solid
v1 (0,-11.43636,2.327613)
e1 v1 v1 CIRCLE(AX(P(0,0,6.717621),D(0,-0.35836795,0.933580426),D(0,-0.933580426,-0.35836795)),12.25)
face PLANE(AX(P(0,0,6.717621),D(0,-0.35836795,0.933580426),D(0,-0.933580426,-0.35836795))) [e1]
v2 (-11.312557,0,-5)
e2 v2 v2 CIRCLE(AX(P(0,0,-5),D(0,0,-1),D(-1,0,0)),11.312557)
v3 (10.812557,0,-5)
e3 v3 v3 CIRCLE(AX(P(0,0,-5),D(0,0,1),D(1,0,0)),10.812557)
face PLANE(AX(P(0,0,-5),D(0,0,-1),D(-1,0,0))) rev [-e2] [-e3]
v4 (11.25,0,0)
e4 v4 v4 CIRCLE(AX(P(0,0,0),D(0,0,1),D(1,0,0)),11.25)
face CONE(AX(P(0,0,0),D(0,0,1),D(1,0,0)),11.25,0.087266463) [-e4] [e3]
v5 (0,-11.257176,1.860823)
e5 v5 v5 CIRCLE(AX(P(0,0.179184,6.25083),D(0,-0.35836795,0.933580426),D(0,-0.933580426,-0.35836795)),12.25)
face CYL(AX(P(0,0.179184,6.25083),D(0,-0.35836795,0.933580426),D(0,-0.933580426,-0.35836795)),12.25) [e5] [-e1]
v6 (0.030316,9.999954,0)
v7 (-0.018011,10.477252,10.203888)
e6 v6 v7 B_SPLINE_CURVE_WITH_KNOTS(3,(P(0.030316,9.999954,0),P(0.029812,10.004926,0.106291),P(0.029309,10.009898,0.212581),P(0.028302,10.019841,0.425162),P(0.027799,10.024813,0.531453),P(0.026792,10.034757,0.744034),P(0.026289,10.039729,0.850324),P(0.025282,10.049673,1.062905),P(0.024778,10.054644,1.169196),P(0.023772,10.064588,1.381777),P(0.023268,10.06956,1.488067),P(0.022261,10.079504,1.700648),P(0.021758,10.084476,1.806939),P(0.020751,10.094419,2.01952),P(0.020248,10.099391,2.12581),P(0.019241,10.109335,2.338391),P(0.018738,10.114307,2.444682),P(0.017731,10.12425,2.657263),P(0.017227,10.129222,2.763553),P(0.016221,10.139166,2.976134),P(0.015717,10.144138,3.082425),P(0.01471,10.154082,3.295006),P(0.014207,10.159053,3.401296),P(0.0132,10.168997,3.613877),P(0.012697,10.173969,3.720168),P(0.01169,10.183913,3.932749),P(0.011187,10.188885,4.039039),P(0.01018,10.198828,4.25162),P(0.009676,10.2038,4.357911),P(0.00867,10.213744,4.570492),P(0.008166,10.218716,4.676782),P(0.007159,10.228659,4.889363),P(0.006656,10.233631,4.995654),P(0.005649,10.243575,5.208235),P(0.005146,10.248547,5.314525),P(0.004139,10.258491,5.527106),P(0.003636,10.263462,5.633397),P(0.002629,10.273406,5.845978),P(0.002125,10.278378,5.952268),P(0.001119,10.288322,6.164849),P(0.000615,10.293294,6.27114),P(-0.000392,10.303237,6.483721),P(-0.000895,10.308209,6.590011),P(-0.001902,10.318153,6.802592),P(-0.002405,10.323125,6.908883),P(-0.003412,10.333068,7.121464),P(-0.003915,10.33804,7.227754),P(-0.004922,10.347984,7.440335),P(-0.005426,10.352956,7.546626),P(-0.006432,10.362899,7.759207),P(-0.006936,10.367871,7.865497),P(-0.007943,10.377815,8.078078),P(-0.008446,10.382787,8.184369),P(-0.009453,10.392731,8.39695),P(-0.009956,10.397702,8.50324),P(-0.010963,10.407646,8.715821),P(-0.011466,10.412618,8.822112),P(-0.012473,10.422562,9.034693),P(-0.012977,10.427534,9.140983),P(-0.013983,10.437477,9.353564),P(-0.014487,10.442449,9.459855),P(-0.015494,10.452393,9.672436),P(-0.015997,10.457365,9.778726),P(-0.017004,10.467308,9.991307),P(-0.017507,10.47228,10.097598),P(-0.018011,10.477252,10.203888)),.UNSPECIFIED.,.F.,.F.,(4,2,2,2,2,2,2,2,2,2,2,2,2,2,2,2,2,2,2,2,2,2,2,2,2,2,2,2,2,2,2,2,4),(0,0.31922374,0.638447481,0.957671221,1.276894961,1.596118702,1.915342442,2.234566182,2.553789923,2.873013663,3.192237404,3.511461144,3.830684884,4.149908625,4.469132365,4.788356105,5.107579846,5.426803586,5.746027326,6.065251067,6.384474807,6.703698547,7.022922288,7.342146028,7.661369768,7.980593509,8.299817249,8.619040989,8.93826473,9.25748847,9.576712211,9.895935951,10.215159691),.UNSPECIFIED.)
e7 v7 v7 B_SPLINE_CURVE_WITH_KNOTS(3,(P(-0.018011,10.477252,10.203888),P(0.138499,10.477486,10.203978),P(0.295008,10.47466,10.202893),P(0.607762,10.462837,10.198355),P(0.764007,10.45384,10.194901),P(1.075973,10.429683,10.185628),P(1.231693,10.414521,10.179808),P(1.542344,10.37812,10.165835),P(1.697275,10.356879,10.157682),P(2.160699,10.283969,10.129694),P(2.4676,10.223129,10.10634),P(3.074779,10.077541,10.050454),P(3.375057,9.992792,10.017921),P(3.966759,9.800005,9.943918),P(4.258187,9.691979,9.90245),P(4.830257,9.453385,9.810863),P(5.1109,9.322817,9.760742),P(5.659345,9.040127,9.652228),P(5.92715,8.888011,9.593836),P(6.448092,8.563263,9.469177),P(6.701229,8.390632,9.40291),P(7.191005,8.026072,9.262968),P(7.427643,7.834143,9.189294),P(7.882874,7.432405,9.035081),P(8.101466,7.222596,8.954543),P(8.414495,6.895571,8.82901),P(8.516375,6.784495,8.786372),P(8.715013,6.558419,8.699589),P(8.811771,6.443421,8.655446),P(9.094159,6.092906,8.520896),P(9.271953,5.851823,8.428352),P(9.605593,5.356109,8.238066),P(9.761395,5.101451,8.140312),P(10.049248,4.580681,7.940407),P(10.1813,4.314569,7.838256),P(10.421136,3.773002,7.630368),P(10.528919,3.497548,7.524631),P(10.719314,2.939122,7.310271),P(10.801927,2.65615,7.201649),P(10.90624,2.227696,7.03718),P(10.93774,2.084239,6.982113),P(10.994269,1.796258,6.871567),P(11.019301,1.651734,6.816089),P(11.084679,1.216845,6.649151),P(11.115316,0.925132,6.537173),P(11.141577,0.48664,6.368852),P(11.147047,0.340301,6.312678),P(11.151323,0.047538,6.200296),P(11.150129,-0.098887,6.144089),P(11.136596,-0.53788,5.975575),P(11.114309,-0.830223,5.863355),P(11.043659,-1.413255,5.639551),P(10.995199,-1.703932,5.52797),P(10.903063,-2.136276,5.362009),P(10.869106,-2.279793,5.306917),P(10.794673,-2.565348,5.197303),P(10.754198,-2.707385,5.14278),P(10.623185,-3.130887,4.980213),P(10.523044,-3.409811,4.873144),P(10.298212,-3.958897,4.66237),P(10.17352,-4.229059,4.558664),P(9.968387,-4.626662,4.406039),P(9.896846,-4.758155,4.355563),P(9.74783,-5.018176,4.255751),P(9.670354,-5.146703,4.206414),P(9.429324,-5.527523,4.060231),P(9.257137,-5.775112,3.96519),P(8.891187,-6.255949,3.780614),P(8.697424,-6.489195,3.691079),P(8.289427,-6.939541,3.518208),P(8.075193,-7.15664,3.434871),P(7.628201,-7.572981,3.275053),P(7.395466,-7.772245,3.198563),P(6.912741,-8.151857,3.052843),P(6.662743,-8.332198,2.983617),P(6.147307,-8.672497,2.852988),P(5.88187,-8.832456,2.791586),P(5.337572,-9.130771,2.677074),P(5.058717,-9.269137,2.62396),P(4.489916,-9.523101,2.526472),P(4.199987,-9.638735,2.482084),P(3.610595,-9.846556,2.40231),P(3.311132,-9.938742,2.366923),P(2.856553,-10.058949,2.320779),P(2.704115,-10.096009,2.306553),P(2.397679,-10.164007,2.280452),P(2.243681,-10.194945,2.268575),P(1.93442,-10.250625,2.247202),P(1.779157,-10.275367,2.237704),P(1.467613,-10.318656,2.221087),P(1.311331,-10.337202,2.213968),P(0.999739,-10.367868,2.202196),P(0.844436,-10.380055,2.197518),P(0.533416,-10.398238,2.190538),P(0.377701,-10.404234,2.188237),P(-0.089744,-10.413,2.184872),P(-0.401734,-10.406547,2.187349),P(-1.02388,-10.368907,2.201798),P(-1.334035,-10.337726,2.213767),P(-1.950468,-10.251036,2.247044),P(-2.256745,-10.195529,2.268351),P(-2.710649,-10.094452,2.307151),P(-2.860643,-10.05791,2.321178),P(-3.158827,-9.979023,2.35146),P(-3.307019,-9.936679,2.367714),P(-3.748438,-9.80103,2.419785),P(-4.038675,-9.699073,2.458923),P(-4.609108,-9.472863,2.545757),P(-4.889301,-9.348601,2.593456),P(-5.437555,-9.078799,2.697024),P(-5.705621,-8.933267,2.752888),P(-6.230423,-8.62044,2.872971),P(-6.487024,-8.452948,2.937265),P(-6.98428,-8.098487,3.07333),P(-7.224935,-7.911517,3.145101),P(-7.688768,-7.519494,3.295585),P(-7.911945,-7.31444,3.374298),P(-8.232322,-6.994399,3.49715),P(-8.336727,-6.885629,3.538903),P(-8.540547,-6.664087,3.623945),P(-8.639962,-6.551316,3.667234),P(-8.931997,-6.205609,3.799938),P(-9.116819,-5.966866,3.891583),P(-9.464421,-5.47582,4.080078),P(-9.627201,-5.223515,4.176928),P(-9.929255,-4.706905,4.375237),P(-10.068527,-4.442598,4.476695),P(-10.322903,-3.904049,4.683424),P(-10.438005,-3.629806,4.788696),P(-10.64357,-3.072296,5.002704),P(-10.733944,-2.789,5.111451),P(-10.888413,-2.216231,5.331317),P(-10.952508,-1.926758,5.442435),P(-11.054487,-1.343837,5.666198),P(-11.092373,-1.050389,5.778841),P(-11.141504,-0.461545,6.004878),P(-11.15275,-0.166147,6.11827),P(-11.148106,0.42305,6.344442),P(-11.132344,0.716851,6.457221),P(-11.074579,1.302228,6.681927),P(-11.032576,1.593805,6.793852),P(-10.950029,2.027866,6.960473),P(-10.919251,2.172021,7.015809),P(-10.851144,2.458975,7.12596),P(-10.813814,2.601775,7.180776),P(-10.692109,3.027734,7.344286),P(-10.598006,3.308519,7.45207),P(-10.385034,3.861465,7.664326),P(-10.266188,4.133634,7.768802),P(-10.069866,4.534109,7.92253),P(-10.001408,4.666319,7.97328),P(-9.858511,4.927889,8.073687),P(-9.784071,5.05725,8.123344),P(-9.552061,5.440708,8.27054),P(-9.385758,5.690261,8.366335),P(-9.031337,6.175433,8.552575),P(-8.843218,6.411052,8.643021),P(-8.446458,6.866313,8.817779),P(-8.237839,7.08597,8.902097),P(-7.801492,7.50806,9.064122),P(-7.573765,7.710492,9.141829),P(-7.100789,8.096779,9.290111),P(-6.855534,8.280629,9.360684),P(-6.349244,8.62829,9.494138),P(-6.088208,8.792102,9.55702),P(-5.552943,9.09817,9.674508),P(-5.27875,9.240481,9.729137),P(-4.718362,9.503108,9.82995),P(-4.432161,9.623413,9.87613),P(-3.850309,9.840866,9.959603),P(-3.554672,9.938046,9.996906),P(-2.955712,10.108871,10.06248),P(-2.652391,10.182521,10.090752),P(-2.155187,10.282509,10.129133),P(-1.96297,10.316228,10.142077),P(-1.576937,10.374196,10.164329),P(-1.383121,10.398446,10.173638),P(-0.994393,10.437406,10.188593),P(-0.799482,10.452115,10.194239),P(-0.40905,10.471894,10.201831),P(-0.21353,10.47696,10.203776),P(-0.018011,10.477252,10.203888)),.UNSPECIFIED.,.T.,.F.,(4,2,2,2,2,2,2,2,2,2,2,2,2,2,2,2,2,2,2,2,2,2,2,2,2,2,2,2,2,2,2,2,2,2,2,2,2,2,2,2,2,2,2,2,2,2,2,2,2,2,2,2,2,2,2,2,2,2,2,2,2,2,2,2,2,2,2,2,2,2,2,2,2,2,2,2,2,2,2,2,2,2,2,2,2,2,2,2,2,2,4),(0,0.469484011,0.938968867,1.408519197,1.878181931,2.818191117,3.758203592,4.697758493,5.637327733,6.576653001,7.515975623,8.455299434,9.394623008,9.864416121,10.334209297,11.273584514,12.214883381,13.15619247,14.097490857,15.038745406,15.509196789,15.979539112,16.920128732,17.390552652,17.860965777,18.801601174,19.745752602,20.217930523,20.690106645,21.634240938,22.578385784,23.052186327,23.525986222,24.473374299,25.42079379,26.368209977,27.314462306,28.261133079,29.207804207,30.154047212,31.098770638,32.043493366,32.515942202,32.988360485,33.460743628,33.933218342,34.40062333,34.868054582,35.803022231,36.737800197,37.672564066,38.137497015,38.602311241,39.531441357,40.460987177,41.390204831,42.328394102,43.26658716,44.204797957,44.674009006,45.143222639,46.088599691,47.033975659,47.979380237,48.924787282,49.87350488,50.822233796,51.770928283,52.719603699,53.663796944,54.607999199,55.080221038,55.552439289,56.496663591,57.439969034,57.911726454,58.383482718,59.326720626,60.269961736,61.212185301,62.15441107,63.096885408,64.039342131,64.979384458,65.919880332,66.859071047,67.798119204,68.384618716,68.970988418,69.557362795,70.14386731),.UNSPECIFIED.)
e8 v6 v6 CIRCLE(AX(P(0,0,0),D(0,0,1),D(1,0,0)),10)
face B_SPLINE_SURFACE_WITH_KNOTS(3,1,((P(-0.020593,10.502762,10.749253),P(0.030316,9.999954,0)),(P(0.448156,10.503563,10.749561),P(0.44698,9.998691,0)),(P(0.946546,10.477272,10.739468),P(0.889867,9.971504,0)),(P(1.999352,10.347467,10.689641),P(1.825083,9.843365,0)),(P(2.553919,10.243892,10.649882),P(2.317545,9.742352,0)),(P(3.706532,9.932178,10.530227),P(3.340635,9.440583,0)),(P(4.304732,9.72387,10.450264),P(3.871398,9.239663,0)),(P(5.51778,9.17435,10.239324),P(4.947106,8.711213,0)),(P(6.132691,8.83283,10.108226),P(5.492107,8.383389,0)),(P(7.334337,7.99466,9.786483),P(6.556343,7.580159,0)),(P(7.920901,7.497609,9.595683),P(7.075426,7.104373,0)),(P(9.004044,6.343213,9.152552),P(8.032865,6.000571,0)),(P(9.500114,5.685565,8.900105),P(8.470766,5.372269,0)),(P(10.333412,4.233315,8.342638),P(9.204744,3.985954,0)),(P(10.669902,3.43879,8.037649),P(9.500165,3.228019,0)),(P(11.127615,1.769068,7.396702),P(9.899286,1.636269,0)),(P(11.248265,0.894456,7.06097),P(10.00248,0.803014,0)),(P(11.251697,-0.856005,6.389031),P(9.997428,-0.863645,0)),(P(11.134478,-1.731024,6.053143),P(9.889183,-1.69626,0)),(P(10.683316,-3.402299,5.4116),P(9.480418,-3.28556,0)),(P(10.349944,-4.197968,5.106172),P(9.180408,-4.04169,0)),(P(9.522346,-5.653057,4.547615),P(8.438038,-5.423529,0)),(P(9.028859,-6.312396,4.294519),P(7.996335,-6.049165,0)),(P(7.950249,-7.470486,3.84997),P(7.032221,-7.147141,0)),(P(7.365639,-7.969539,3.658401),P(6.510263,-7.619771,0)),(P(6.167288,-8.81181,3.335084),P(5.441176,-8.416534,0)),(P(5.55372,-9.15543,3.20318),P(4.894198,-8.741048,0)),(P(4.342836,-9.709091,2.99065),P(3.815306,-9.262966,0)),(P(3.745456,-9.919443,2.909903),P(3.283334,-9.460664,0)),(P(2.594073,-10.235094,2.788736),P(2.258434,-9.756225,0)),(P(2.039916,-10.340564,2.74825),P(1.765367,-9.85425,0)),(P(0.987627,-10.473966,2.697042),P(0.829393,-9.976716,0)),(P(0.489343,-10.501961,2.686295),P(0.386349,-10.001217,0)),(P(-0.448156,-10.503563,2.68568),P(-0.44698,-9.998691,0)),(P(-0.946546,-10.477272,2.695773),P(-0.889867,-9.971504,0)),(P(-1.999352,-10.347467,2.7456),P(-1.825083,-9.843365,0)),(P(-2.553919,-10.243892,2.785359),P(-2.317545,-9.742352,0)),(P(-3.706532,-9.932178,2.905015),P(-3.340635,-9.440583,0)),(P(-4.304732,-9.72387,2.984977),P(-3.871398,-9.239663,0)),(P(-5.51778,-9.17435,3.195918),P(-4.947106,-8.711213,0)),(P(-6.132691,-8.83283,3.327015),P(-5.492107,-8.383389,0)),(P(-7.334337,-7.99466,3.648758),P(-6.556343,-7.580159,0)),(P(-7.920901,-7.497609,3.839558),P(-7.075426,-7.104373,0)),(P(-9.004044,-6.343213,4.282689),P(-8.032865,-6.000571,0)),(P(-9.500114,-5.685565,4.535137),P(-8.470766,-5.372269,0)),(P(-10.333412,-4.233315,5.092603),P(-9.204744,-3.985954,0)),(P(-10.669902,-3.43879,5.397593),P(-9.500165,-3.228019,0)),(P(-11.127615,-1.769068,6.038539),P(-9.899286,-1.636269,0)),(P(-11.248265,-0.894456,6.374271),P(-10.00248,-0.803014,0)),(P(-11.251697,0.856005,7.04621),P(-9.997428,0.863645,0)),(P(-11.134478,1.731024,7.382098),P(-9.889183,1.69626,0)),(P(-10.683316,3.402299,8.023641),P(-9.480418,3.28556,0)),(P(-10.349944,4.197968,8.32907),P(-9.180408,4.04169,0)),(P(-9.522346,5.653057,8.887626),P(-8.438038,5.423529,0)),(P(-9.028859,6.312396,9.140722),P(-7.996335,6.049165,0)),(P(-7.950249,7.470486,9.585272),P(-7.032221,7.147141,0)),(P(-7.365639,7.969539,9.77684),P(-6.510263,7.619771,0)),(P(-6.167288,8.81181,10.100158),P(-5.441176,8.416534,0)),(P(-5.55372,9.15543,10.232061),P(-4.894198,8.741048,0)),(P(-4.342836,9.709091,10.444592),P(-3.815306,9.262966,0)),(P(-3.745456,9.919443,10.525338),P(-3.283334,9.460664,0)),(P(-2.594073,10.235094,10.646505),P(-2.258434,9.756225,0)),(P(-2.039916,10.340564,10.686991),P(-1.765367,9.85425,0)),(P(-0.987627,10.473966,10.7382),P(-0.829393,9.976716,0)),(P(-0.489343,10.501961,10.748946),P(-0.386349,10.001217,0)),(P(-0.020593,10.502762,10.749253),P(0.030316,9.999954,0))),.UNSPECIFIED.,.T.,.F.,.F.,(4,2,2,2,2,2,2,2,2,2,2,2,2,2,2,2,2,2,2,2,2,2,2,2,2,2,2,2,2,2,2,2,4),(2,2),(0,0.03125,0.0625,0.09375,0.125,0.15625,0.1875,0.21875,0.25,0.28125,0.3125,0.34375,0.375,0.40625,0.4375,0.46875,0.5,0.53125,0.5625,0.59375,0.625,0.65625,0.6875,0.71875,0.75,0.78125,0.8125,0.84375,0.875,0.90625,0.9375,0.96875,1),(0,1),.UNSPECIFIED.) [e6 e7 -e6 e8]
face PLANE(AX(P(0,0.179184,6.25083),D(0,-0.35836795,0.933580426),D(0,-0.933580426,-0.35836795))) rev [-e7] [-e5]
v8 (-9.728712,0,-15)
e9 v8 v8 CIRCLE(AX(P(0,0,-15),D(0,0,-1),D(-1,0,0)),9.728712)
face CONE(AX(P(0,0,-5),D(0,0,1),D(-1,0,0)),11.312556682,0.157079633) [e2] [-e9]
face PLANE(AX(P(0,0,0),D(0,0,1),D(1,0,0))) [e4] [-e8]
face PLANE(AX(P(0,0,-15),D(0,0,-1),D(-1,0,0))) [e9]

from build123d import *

# Parameters (mm, degrees)
SKETCH1_R           = 11.25
BOSS_EXTRUDE1_DEPTH = 5
BOSS_EXTRUDE1_DRAFT = -5
SKETCH4_R           = 11.312556682
BOSS_EXTRUDE2_DEPTH = 10
BOSS_EXTRUDE2_TAPER = 9
SKETCH3_R           = 11.25
SKETCH1_38_R        = 10
SKETCH3_7_R         = 12.25
BOSS_EXTRUDE4_DEPTH = 0.5


with BuildPart() as part:
    # Sketch1 → Boss-Extrude1 (with draft: the straight prism first)
    with BuildSketch(Plane.XY):
        Circle(SKETCH1_R)
    extrude(amount=-BOSS_EXTRUDE1_DEPTH)
    # Boss-Extrude1: the draft: its side faces are tilted about the plane it starts from
    boss_extrude1_sides = [part.faces().sort_by_distance(p)[0] for p in [
        (-11.25, 0, -2.5),
    ]]
    draft(boss_extrude1_sides, Plane.XY, BOSS_EXTRUDE1_DRAFT)

    # Sketch4 → Boss-Extrude2 (add)
    with BuildSketch(Plane(origin=(0, 0, -5), x_dir=(-1, 0, 0), z_dir=(0, 0, -1))):
        Circle(SKETCH4_R)
    extrude(amount=BOSS_EXTRUDE2_DEPTH, taper=BOSS_EXTRUDE2_TAPER)

    # Sketch3 → Loft2 section 0
    with BuildSketch(Plane(origin=(0, -2.247482777, 5.854892806), x_dir=(1, 0, 0), z_dir=(0, -0.358367949545301, 0.9335804264972015))):
        with Locations((0, 2.407379925)):
            Circle(SKETCH3_R)
    # Sketch1<38> → Loft2 section 1
    with BuildSketch(Plane.XY):
        Circle(SKETCH1_38_R)
    loft()

    # Sketch3<7> → Boss-Extrude4 (add)
    with BuildSketch(Plane(origin=(0, -2.247482777, 5.854892806), x_dir=(1, 0, 0), z_dir=(0, -0.358367949545301, 0.9335804264972015))):
        with Locations(Location((0, 2.407379925, 0), (0, 0, 270))):
            Circle(SKETCH3_7_R)
    extrude(amount=-BOSS_EXTRUDE4_DEPTH)


solid = part.part
